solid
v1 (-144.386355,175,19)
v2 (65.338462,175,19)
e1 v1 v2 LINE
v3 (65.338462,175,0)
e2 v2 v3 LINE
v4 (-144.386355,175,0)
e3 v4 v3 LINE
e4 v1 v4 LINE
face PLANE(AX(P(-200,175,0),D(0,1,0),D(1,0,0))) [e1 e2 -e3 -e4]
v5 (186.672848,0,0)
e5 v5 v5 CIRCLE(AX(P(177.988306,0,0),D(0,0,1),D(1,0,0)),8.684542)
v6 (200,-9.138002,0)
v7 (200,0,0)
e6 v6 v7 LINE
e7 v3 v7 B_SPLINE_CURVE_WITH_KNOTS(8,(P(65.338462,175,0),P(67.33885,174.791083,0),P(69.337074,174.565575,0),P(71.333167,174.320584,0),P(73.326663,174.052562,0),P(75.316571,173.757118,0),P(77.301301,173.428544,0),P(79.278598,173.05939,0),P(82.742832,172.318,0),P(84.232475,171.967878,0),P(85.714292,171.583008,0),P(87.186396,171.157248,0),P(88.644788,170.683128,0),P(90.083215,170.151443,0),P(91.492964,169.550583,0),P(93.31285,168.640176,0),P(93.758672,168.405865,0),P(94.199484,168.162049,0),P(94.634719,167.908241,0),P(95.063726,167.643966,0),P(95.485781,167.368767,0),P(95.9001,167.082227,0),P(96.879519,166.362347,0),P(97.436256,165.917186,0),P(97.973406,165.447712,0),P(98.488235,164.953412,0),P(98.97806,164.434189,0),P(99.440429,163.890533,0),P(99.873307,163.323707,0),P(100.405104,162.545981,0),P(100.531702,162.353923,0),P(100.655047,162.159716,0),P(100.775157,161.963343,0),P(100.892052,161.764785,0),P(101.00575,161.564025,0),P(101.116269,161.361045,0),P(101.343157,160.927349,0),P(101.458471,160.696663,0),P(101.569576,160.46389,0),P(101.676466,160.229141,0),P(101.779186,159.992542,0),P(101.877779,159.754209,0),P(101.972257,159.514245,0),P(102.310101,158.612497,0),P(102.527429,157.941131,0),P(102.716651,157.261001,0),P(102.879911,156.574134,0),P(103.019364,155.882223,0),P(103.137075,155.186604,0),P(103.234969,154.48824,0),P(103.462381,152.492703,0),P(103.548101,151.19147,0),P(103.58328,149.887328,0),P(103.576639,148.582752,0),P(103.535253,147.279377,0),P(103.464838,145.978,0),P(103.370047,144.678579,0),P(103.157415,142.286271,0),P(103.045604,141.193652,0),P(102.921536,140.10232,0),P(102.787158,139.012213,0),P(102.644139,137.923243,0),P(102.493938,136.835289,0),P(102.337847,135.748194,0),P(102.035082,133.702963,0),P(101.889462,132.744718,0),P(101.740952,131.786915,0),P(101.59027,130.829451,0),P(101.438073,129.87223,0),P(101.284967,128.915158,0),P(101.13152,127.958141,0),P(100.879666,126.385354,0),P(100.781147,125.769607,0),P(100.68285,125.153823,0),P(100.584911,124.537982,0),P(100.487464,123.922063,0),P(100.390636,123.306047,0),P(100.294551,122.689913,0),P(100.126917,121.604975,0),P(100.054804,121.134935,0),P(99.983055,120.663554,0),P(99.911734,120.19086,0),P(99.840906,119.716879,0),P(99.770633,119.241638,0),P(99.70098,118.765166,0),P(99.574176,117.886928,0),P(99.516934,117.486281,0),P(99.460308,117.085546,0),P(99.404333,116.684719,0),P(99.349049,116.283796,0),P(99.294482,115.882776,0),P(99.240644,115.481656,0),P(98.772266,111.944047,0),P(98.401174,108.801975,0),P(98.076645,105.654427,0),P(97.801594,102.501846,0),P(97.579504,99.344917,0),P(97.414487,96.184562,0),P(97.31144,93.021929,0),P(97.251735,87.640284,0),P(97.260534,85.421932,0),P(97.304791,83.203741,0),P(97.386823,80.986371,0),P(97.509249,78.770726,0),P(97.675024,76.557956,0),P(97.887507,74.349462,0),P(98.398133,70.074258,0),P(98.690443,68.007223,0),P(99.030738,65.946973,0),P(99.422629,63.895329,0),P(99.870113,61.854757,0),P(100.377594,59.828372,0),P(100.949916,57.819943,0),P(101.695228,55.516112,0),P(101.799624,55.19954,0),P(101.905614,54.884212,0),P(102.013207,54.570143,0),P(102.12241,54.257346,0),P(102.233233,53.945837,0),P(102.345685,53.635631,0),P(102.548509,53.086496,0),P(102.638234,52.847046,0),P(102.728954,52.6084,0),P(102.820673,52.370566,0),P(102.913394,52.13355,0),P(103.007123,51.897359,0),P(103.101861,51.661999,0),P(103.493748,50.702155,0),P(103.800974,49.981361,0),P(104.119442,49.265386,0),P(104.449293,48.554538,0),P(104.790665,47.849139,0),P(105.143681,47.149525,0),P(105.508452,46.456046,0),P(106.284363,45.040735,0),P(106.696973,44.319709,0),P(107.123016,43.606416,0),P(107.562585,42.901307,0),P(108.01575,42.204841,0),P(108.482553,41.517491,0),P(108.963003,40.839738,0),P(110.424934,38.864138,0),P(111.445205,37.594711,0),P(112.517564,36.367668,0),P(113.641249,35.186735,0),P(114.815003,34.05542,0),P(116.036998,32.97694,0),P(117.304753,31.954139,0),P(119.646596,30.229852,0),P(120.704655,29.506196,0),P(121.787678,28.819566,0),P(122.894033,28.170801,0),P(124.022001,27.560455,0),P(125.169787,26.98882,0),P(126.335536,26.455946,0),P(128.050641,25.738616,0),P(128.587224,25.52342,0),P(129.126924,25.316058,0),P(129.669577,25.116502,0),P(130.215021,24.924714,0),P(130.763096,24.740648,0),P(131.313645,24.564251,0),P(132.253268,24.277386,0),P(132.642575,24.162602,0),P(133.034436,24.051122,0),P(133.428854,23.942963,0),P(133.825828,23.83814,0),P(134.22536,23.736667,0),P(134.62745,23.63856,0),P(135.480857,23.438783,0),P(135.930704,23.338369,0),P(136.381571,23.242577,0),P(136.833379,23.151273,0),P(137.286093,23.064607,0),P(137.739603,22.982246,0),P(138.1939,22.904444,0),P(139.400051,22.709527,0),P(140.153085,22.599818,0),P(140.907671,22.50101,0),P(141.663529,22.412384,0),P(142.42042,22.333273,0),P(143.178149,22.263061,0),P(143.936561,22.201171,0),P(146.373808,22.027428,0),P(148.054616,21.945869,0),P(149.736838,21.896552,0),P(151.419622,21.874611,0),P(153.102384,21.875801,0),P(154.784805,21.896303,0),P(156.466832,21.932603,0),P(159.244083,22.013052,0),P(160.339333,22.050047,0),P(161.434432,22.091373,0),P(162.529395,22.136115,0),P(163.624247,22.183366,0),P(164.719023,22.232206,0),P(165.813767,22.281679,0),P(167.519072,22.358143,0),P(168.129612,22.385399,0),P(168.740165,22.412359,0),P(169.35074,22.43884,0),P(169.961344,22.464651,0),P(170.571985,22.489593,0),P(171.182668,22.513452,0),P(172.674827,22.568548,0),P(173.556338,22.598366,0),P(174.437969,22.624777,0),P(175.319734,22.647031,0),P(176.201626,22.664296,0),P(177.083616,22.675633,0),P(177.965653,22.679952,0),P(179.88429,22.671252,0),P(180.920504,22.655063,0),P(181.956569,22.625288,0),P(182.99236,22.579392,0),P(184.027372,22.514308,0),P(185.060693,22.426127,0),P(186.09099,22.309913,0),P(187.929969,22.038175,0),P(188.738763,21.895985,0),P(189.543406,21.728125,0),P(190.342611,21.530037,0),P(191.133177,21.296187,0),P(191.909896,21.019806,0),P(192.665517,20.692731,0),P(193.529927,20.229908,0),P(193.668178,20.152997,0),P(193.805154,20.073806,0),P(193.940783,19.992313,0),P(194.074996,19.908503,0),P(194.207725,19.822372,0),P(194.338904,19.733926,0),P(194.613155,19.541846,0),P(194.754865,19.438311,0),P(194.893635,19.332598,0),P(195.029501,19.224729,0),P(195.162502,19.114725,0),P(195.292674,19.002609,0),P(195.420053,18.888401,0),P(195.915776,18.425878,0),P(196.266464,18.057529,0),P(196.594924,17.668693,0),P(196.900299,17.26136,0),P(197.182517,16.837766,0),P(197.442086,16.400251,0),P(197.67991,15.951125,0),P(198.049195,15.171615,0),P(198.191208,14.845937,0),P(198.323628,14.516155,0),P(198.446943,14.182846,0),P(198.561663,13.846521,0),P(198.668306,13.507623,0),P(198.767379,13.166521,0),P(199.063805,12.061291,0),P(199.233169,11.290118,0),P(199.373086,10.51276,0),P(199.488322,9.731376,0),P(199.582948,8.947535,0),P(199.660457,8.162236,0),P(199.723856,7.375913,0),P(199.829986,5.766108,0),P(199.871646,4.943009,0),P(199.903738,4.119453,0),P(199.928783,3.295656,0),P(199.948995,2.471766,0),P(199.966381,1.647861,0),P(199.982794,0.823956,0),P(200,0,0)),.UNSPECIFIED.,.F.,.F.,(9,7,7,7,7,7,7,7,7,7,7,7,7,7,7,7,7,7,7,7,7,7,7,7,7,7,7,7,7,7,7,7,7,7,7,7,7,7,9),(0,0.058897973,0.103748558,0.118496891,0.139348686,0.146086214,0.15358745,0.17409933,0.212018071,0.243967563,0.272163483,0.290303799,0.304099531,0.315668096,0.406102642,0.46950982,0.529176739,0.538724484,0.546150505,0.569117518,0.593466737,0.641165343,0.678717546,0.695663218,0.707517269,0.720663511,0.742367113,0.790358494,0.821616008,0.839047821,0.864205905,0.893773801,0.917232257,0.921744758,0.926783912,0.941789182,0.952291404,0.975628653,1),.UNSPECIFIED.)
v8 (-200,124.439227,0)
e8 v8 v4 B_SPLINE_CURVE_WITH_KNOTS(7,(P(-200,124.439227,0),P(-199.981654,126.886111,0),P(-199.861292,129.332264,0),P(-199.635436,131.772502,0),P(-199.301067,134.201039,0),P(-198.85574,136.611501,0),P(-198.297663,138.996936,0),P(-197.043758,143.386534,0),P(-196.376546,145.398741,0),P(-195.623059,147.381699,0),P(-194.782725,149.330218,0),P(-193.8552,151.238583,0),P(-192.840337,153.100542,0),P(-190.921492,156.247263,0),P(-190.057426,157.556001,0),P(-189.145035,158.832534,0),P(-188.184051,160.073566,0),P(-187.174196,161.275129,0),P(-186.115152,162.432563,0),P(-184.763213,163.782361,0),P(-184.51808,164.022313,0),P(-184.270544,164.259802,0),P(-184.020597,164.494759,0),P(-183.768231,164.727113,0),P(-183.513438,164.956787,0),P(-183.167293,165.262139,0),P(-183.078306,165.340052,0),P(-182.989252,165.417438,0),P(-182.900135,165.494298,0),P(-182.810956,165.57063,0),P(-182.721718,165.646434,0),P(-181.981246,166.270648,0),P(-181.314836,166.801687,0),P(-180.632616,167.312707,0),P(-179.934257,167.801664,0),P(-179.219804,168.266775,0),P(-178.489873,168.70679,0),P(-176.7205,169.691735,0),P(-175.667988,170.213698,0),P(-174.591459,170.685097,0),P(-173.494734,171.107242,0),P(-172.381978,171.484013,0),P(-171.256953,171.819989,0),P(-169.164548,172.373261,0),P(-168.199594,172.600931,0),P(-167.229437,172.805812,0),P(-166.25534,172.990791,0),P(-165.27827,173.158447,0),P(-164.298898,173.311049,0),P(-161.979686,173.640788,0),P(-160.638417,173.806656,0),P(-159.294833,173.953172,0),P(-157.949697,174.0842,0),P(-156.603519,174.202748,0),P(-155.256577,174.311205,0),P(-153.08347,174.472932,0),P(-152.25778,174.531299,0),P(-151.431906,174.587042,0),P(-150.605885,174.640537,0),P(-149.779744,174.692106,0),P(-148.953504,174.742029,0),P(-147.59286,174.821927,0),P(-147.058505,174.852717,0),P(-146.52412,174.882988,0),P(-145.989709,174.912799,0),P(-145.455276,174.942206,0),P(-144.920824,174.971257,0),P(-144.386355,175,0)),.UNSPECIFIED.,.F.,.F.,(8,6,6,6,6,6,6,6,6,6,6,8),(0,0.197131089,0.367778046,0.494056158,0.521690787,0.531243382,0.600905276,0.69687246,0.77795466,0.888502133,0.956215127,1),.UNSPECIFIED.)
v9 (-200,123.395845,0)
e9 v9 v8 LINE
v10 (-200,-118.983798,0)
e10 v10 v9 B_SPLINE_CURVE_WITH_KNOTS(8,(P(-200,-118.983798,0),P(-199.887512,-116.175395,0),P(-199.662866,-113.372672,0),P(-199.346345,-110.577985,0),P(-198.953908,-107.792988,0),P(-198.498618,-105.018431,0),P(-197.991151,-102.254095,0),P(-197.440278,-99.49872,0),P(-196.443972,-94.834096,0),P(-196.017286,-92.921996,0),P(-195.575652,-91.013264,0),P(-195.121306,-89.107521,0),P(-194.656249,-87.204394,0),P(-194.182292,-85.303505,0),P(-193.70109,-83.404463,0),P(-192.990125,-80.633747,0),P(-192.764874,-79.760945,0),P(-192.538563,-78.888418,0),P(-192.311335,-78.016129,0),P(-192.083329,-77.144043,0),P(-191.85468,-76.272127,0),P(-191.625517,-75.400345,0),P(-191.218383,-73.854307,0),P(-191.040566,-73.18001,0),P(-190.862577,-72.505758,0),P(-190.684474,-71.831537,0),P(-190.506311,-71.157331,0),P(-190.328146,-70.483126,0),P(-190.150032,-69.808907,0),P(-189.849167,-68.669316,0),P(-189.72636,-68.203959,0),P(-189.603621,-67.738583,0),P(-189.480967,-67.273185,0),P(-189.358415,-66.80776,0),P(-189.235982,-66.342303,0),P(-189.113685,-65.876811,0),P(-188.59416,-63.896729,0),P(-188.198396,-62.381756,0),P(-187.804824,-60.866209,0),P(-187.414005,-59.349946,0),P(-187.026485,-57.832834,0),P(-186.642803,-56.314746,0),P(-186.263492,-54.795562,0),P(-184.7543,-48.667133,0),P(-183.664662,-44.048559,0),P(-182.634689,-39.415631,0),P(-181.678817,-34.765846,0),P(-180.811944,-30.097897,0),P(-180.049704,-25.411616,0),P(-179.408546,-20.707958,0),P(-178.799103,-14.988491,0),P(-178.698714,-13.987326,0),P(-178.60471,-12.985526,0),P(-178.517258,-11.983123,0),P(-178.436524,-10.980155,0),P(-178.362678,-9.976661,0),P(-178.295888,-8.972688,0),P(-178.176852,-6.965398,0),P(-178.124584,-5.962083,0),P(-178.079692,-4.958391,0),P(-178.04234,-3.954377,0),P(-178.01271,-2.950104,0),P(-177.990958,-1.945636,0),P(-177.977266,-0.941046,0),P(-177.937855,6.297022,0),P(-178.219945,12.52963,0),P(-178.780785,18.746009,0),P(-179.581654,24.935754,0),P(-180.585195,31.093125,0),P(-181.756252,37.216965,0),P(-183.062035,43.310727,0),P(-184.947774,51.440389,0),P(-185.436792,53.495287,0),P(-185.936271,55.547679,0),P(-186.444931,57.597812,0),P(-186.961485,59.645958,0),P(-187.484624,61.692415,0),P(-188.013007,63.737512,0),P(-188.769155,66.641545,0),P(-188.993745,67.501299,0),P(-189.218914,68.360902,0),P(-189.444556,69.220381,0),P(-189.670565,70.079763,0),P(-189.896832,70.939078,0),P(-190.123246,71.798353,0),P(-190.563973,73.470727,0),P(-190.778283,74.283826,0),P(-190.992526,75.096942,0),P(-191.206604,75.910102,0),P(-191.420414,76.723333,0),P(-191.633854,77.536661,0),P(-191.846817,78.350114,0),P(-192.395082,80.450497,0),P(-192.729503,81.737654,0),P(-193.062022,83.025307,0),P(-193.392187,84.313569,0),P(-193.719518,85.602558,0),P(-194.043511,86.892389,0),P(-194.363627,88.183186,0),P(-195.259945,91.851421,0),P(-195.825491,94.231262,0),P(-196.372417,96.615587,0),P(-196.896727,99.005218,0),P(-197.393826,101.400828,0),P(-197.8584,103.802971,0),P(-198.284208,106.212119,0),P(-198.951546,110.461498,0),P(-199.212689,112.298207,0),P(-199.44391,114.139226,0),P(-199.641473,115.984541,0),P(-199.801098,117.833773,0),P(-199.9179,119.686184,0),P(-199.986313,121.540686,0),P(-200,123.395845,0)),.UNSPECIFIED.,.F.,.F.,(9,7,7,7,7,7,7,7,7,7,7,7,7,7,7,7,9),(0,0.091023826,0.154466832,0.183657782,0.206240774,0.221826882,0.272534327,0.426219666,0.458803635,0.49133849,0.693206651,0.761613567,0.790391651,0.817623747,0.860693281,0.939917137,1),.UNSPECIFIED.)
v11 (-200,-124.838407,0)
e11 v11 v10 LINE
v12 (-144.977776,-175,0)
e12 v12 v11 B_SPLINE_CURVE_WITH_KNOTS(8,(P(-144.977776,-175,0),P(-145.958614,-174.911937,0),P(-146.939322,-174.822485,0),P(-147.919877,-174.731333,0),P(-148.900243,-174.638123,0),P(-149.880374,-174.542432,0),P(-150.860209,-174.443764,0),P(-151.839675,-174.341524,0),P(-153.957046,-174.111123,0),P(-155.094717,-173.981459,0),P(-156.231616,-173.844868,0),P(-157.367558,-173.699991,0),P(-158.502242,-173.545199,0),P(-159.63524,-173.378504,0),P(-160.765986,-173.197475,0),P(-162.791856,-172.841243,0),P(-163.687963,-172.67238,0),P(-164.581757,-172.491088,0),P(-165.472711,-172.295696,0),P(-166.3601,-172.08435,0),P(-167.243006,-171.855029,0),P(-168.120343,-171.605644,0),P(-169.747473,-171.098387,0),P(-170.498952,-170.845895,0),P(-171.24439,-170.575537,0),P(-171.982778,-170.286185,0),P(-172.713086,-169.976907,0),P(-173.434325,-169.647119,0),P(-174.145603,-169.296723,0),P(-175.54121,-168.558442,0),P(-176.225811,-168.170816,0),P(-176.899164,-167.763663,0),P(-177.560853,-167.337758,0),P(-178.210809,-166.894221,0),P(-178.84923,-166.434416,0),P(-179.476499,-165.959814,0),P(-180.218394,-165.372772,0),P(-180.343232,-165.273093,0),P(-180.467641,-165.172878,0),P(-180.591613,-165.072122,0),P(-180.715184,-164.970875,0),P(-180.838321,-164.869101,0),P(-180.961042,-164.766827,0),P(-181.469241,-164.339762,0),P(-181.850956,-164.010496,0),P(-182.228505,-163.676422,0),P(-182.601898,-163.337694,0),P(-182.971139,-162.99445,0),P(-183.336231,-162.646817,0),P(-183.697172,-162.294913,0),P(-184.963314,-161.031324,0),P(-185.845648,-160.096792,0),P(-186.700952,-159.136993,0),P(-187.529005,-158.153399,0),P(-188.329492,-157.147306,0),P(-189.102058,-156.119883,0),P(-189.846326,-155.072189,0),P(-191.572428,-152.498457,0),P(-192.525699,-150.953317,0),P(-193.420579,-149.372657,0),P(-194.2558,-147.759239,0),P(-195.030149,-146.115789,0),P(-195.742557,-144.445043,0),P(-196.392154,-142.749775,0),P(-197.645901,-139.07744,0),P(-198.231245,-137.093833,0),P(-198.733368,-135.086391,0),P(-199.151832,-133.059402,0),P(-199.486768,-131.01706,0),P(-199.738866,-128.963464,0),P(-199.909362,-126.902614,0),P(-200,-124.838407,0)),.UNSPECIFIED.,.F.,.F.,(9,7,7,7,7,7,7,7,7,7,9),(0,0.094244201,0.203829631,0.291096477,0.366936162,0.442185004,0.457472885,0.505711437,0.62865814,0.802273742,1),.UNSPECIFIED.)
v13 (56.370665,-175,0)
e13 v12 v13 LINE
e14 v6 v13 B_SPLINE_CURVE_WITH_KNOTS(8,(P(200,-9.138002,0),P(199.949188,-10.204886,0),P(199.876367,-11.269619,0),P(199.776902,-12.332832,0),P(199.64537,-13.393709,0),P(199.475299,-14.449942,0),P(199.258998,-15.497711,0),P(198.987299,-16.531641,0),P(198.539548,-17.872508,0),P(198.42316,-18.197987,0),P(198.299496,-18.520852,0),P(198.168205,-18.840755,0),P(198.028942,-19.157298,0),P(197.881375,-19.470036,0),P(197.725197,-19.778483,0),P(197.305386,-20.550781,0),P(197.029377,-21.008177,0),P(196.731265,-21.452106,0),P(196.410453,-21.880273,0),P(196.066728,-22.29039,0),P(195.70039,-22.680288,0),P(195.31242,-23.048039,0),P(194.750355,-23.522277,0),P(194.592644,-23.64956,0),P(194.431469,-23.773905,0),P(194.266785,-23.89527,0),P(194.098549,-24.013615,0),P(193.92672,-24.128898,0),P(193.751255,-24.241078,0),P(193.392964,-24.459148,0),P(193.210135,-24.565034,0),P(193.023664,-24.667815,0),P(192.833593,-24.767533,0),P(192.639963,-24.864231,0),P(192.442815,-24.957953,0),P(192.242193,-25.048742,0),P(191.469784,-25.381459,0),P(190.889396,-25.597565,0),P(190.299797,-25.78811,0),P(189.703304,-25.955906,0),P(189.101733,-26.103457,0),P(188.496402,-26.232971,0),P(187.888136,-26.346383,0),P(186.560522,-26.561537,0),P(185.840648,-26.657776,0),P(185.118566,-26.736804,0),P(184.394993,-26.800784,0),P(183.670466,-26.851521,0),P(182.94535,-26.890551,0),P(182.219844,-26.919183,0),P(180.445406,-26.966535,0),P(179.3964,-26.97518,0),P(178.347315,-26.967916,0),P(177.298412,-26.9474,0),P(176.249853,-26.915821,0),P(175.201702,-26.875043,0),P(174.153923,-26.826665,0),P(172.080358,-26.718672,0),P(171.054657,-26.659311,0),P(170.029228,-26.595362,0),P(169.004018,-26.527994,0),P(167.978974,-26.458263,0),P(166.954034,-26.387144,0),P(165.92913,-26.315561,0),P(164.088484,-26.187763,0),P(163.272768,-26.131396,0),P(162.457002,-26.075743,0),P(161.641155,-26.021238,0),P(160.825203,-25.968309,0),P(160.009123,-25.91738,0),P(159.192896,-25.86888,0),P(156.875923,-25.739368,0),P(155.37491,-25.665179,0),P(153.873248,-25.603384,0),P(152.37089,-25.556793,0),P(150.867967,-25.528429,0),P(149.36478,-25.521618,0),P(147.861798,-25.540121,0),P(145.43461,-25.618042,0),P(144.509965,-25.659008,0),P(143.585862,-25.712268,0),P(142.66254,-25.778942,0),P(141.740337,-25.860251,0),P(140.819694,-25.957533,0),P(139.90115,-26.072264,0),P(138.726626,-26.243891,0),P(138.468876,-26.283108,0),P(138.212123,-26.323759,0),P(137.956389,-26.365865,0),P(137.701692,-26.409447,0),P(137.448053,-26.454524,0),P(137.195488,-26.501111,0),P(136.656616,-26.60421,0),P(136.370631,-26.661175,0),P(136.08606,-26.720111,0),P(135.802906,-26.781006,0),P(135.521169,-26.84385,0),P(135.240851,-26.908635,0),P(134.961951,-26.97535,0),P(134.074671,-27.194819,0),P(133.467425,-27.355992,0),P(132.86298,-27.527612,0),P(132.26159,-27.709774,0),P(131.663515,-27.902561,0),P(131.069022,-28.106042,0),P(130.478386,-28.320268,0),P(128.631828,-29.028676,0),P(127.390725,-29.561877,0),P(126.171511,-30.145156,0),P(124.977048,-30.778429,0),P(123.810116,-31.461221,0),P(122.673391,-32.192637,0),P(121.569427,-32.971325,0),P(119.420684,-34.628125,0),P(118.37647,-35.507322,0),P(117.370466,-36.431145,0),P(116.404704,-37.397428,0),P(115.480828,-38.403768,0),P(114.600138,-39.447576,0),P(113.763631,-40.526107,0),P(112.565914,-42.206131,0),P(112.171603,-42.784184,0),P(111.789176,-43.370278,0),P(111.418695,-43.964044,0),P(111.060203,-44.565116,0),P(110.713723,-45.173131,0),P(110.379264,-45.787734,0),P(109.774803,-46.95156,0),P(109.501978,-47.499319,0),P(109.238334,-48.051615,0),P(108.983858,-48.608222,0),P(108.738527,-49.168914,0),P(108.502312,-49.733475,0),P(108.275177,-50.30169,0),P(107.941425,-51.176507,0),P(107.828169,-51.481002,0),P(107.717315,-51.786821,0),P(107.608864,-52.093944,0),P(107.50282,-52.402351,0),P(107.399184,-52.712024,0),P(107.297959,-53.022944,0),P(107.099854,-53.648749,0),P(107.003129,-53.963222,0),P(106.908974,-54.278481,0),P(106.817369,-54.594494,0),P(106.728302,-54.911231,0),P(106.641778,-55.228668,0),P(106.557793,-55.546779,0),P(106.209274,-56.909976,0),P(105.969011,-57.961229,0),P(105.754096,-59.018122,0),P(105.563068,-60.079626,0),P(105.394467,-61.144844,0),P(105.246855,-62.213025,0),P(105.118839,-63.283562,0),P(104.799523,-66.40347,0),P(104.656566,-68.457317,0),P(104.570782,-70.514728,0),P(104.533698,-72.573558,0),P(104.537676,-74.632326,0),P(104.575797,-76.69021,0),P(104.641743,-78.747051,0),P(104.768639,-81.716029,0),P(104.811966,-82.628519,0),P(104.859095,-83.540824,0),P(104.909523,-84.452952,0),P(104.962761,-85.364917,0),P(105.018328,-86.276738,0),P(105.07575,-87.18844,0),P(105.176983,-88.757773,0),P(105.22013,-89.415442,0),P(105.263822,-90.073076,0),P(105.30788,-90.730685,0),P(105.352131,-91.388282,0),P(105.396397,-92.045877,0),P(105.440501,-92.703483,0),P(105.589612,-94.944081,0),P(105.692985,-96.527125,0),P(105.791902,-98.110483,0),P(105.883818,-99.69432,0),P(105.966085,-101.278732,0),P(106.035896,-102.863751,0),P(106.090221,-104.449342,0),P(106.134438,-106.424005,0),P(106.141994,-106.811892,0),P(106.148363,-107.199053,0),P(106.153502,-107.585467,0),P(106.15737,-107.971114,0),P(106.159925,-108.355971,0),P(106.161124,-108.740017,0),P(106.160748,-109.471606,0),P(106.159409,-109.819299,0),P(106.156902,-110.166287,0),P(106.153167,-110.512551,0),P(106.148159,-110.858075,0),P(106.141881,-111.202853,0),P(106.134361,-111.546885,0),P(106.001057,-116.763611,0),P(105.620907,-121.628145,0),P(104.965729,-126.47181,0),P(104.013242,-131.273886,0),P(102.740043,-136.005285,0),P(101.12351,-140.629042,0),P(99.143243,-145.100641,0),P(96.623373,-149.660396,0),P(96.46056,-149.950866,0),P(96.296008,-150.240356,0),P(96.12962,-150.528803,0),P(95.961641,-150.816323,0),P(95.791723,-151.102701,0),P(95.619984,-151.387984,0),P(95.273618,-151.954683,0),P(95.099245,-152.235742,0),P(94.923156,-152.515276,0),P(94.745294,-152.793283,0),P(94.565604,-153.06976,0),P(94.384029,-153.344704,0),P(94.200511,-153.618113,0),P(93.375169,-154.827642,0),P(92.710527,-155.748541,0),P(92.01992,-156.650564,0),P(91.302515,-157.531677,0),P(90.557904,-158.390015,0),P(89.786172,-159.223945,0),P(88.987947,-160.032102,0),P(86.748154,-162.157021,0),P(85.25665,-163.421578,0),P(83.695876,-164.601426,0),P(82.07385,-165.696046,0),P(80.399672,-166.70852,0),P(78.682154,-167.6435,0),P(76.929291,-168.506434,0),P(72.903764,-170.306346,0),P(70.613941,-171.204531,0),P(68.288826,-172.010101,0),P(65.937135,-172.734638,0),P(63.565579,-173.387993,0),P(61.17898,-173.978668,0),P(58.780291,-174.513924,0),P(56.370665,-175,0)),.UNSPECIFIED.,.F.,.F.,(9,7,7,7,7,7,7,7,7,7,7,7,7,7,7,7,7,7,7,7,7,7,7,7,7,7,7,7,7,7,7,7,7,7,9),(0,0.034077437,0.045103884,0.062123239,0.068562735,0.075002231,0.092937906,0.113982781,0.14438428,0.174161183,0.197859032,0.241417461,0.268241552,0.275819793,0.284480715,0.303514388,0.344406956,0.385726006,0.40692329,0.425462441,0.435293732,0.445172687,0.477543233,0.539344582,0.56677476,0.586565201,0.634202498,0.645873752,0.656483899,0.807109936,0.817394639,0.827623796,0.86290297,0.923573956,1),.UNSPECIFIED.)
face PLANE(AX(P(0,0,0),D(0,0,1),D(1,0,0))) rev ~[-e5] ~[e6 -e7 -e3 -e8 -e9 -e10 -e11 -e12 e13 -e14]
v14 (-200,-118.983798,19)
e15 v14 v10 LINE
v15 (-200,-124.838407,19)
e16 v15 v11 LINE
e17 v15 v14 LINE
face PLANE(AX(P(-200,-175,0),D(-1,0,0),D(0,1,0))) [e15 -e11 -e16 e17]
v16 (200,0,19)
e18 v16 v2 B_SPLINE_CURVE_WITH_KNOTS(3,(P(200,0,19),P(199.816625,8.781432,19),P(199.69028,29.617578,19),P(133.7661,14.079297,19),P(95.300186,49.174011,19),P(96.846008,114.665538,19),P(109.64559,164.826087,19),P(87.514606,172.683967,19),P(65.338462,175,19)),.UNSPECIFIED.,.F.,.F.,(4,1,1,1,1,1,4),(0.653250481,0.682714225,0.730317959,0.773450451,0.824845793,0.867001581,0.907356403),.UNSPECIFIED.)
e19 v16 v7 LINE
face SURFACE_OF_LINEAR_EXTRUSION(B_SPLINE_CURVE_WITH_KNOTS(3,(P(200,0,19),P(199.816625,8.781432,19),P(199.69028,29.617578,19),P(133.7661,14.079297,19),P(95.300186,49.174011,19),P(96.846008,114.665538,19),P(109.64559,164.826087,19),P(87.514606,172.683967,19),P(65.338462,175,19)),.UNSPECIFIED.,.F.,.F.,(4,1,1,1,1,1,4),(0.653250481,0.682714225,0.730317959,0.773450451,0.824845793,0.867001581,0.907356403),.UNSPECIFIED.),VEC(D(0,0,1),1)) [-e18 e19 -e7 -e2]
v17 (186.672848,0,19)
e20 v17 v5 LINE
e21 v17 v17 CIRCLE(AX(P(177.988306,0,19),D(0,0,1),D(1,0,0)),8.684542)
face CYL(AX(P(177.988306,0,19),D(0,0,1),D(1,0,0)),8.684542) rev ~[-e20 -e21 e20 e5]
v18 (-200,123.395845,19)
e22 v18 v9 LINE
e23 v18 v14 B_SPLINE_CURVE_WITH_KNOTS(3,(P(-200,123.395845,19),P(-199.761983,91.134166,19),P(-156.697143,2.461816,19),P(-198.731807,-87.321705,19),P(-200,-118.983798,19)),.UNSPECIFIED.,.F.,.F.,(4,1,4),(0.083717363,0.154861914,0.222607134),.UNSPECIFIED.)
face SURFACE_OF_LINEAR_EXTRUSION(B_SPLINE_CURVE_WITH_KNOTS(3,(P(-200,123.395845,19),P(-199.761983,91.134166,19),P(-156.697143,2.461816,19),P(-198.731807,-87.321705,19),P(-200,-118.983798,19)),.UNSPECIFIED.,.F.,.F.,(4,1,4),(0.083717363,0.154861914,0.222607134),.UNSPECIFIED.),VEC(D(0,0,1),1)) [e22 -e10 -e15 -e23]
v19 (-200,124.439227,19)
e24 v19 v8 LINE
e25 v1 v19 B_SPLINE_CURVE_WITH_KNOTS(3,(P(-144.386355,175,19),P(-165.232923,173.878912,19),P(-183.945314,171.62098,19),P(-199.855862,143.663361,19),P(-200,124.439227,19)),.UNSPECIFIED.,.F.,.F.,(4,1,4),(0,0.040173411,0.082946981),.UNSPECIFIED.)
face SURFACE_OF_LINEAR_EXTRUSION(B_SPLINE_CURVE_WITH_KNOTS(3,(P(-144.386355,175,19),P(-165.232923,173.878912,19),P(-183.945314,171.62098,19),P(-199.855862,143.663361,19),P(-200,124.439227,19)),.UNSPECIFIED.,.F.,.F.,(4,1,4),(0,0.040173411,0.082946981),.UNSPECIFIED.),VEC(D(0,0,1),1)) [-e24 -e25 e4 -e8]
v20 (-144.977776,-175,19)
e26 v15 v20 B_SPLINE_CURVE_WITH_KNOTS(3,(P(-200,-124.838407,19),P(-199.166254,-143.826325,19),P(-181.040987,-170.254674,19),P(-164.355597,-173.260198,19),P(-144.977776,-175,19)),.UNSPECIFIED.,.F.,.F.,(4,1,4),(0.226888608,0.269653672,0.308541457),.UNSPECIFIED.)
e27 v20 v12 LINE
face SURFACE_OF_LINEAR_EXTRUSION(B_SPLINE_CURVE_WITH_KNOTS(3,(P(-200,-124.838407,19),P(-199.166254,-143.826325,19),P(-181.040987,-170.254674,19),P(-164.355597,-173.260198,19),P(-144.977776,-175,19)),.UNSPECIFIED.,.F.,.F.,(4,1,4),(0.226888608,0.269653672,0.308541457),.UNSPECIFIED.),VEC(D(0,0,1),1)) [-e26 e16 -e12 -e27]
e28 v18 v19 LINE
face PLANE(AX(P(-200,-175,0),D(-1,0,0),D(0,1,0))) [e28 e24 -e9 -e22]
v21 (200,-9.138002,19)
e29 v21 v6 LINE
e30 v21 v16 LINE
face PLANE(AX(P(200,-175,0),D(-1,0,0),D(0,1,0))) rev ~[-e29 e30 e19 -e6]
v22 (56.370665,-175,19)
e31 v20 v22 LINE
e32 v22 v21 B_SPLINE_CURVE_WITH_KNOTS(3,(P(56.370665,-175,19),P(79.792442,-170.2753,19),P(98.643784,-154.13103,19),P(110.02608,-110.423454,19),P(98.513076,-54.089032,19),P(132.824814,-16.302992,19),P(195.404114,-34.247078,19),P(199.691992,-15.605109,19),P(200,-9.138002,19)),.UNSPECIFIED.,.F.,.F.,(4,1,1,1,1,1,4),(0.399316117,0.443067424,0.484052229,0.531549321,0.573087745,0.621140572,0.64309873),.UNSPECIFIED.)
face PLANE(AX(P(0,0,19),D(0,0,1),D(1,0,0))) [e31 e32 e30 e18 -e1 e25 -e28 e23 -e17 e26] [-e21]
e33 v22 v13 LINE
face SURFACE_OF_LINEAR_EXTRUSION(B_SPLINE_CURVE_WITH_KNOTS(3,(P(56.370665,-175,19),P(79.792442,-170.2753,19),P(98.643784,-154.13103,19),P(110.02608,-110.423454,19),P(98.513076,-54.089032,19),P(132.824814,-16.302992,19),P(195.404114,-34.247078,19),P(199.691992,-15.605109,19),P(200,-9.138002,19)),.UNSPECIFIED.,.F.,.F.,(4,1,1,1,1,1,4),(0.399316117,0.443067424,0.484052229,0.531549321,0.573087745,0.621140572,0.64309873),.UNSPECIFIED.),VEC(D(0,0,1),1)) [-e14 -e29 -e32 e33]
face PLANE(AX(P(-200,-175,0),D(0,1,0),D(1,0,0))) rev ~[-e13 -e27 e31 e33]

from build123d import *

# Parameters (mm, degrees)
F0_W     = 400
F0_H     = 350
F1_DEPTH = 19
F3_DEPTH = 19.001
F2_R     = 8.68454191
F4_DEPTH = 19.0010001


with BuildPart() as f1:
    # F0 (on Top) → F1 (new body)
    with BuildSketch(Plane.XY):
        Rectangle(F0_W, F0_H)
    extrude(amount=F1_DEPTH)

    # F2 (on face) → F3 (cut, through all)
    with BuildSketch(Plane.XY.offset(19)):
        with BuildLine():
            add(Edge.make_bspline(
                [(-144.3863546874, 175), (-165.2329227667, 173.8789118896), (-183.9453143709, 171.6209800037), (-199.8558619747, 143.6633605964), (-200, 124.4392270745)],
                knots=[0, 0, 0, 0, 0.0401734108, 0.0829469806, 0.0829469806, 0.0829469806, 0.0829469806], degree=3))
            Line((-144.3863546874, 175), (-200, 175))
            Line((-200, 175), (-200, 124.4392270744))
        make_face()
        with BuildLine():
            Line((200, 175), (65.338462454, 175))
            add(Edge.make_bspline(
                [(200, 0), (199.8166252336, 8.7814322248), (199.690280281, 29.6175777687), (133.7661003093, 14.0792968746), (95.3001860897, 49.1740114485), (96.8460076147, 114.6655377081), (109.6455904435, 164.8260868327), (87.5146063822, 172.6839667365), (65.3384624538, 175)],
                knots=[0.6532504807, 0.6532504807, 0.6532504807, 0.6532504807, 0.682714225, 0.7303179586, 0.7734504511, 0.8248457927, 0.8670015807, 0.907356403, 0.907356403, 0.907356403, 0.907356403], degree=3))
            Line((200, 0), (200, 175))
        make_face()
        with BuildLine():
            add(Edge.make_bspline(
                [(-200, 123.3958447292), (-199.7619832828, 91.134165718), (-156.6971429924, 2.4618160265), (-198.7318065847, -87.3217052913), (-200, -118.9837975818)],
                knots=[0.0837173627, 0.0837173627, 0.0837173627, 0.0837173627, 0.1548619144, 0.2226071343, 0.2226071343, 0.2226071343, 0.2226071343], degree=3))
            Line((-200, 123.3958447292), (-200, -118.9837975818))
        make_face()
        with BuildLine():
            add(Edge.make_bspline(
                [(200, -9.1380018675), (200.142398823, -6.1481129118), (200.0631818853, -3.0256477166), (200, 0)],
                knots=[0.6430987301, 0.6430987301, 0.6430987301, 0.6430987301, 0.6532504807, 0.6532504807, 0.6532504807, 0.6532504807], degree=3))
            Line((200, 0), (200, -9.1380018675))
        make_face()
        with BuildLine():
            Line((200, -175), (200, -9.1380018675))
            add(Edge.make_bspline(
                [(56.3706645187, -175), (79.7924420672, -170.2752995484), (98.643784219, -154.1310296062), (110.0260803826, -110.4234542848), (98.5130759268, -54.0890321848), (132.8248140208, -16.3029922353), (195.4041142771, -34.2470777838), (199.6919924438, -15.6051086243), (200, -9.1380018675)],
                knots=[0.3993161169, 0.3993161169, 0.3993161169, 0.3993161169, 0.4430674241, 0.484052229, 0.5315493208, 0.5730877454, 0.6211405717, 0.6430987301, 0.6430987301, 0.6430987301, 0.6430987301], degree=3))
            Line((56.3706645187, -175), (200, -175))
        make_face()
        with BuildLine():
            add(Edge.make_bspline(
                [(-200, -124.838407108), (-199.1662539063, -143.8263247885), (-181.0409866029, -170.2546743415), (-164.3555968809, -173.2601982495), (-144.9777763545, -175)],
                knots=[0.2268886078, 0.2268886078, 0.2268886078, 0.2268886078, 0.2696536718, 0.3085414567, 0.3085414567, 0.3085414567, 0.3085414567], degree=3))
            Line((-200, -124.8384071079), (-200, -175))
            Line((-200, -175), (-144.9777763545, -175))
        make_face()
    extrude(amount=-F3_DEPTH, mode=Mode.SUBTRACT)

    # F2 (on face) → F4 (cut, through all)
    with BuildSketch(Plane.XY.offset(19)):
        with Locations((177.9883056879, 0)):
            Circle(F2_R)
    extrude(amount=-F4_DEPTH, mode=Mode.SUBTRACT)


solid = f1.part
